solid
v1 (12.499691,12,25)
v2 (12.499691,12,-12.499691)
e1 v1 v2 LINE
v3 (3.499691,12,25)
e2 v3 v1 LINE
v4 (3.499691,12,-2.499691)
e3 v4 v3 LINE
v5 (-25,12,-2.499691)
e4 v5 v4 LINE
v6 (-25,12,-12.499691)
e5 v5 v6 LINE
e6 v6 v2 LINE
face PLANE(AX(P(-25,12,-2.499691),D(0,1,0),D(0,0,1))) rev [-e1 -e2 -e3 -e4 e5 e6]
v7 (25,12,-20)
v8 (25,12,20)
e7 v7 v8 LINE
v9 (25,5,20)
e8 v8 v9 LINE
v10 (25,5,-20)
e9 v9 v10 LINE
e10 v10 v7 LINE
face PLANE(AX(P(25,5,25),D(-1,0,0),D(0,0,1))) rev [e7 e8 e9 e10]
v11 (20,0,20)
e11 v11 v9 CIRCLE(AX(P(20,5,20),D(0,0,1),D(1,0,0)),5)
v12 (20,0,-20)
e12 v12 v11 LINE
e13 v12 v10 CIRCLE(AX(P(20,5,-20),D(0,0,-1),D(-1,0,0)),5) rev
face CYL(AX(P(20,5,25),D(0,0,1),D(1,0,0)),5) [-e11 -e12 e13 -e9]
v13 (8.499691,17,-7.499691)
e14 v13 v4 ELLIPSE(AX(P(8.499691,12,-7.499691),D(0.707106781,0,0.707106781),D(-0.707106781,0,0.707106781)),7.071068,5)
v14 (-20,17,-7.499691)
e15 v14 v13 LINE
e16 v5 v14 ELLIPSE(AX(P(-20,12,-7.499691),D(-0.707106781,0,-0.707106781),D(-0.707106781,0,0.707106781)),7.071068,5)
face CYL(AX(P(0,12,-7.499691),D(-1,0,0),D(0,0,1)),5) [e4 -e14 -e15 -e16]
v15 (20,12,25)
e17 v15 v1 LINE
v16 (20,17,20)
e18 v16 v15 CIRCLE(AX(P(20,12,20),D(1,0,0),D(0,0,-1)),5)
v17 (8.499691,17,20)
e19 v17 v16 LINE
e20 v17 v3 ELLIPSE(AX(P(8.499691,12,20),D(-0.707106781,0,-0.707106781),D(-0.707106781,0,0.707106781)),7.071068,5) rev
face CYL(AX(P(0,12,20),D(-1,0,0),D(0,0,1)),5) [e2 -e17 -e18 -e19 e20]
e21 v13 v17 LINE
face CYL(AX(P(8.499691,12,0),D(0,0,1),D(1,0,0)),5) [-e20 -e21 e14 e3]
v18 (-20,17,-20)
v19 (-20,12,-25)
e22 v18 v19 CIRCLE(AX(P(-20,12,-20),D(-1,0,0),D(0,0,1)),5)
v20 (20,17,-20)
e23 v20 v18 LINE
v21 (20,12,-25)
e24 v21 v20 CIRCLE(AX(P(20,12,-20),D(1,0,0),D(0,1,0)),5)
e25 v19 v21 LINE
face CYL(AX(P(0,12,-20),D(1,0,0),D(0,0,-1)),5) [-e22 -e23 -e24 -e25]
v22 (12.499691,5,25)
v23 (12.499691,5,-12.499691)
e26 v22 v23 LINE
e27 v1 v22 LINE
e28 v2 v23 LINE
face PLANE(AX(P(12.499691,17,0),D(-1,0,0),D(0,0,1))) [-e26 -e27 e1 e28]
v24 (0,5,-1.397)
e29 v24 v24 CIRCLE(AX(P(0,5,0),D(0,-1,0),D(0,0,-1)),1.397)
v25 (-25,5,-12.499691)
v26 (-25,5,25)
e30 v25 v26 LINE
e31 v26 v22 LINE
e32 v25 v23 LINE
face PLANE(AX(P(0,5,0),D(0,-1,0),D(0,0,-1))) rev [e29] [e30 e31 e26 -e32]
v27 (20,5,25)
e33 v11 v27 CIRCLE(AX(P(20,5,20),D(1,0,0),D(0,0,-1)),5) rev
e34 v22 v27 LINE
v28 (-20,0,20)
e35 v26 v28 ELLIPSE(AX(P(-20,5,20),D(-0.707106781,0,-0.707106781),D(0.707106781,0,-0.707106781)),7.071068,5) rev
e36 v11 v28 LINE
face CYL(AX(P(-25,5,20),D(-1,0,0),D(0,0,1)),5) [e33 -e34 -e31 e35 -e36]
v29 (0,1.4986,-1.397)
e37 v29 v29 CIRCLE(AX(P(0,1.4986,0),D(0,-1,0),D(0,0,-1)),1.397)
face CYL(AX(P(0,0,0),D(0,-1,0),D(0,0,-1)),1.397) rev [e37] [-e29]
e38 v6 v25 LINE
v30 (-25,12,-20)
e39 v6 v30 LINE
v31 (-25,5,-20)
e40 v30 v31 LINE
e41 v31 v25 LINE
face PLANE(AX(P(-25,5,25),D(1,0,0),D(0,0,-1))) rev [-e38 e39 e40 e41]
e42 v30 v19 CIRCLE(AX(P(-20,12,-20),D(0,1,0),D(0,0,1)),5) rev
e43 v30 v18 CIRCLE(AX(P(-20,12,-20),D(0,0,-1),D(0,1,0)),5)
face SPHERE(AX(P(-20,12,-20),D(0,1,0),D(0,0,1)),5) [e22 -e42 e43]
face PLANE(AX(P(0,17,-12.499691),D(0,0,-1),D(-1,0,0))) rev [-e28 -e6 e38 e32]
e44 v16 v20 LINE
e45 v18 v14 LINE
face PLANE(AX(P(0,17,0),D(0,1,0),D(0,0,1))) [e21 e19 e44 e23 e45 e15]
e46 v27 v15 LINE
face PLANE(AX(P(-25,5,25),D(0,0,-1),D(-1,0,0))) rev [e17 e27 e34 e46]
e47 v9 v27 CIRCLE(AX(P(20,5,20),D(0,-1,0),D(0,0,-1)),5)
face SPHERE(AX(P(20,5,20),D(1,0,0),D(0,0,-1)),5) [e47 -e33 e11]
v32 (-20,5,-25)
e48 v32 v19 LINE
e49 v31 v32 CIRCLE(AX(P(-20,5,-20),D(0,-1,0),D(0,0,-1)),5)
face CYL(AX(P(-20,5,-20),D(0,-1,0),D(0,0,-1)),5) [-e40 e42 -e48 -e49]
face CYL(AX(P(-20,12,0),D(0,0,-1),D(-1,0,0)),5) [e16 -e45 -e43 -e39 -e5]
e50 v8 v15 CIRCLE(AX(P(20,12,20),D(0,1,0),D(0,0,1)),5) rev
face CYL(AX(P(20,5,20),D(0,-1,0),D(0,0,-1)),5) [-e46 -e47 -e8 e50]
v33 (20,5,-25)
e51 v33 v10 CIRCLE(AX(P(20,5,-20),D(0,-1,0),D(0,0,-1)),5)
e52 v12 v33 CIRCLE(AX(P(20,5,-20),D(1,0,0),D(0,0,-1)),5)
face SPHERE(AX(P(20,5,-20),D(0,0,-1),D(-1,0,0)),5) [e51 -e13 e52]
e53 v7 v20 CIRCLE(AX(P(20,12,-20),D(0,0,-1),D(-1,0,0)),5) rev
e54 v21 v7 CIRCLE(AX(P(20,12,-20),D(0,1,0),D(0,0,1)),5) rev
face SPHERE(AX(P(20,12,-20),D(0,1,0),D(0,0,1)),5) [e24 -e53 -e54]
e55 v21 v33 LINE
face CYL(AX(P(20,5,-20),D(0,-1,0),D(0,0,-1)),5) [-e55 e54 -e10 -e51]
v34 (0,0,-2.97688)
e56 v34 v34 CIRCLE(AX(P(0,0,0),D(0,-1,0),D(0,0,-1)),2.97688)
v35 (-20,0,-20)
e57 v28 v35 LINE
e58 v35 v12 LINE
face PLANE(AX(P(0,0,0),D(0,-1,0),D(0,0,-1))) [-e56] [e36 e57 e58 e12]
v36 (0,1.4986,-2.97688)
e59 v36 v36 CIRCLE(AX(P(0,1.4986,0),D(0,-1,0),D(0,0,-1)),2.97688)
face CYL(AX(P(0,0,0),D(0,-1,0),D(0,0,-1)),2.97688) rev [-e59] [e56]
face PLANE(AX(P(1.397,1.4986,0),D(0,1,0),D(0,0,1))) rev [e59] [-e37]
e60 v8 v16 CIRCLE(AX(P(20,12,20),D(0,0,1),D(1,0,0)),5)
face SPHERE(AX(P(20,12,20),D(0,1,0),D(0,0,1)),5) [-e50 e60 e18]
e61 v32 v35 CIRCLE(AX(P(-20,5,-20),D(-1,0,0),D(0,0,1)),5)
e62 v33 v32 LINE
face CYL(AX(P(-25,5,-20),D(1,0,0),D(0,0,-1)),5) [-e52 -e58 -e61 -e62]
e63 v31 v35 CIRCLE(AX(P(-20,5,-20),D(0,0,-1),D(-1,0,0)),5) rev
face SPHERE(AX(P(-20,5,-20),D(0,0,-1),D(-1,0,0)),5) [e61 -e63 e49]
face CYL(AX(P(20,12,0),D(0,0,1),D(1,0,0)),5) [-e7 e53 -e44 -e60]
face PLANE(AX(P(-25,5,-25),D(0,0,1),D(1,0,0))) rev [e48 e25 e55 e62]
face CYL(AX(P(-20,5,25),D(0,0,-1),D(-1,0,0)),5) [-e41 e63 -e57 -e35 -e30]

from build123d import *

# Parameters (mm, degrees)
SKETCH1_W                                           = 50
SKETCH1_H                                           = 50
BOSS_EXTRUDE1_DEPTH                                 = 5
SKETCH3_W                                           = 37.499690969
SKETCH3_H                                           = 12.500309031
SKETCH3_W_2                                         = 12.500309031
SKETCH3_H_2                                         = 37.499690969
BOSS_EXTRUDE2_DEPTH                                 = 12
SKETCH5_W                                           = 37.499690969
SKETCH5_H                                           = 5
BOSS_EXTRUDE3_DEPTH                                 = 10
SKETCH6_W                                           = 27.499690969
SKETCH6_H                                           = 5
BOSS_EXTRUDE4_DEPTH                                 = 9
FILLET2_R                                           = 5
CBORE_FOR_3_BINDING_HEAD_MACHINE_SCREW1_D           = 2.794
CBORE_FOR_3_BINDING_HEAD_MACHINE_SCREW1_CBORE_D     = 5.95376
CBORE_FOR_3_BINDING_HEAD_MACHINE_SCREW1_CBORE_DEPTH = 1.4986


with BuildPart() as part:
    # Sketch1 → Boss-Extrude1 (new body)
    with BuildSketch(Plane(origin=(0, 0, 0), x_dir=(1, 0, 0), z_dir=(0, 1, 0))):
        Rectangle(SKETCH1_W, SKETCH1_H)
    extrude(amount=BOSS_EXTRUDE1_DEPTH)

    # Sketch3 → Boss-Extrude2 (add)
    with BuildSketch(Plane(origin=(0, 5, 0), x_dir=(1, 0, 0), z_dir=(0, 1, 0))):
        with Locations((-6.250154515, 18.749845484)):
            Rectangle(SKETCH3_W, SKETCH3_H)
        with Locations((18.749845484, 18.749845484)):
            Rectangle(SKETCH3_W_2, SKETCH3_H)
        with Locations((18.749845484, -6.250154515)):
            Rectangle(SKETCH3_W_2, SKETCH3_H_2)
    extrude(amount=BOSS_EXTRUDE2_DEPTH)

    # Sketch5 → Boss-Extrude3 (add)
    with BuildSketch(Plane.XY.offset(-12.499690969)):
        with Locations((-6.250154515, 14.5)):
            Rectangle(SKETCH5_W, SKETCH5_H)
    extrude(amount=BOSS_EXTRUDE3_DEPTH)

    # Sketch6 → Boss-Extrude4 (add)
    with BuildSketch(Plane.ZY.offset(-12.499690969)):
        with Locations((11.250154516, 14.5)):
            Rectangle(SKETCH6_W, SKETCH6_H)
    extrude(amount=BOSS_EXTRUDE4_DEPTH)

    # Fillet2
    fillet2_edges = [part.edges().sort_by_distance(p)[0] for p in [
        (0, 0, 25),
        (-25, 0, 0),
        (0, 0, -25),
        (25, 8.5, -25),
        (-25, 8.5, -25),
        (25, 17, 0),
        (0, 17, -25),
        (-25, 17, -13.749845484),
        (3.499690969, 17, 11.250154516),
        (-10.750154516, 17, -2.499690969),
        (14.249845484, 17, 25),
        (25, 8.5, 25),
        (25, 0, 0),
    ]]
    fillet(fillet2_edges, radius=FILLET2_R - 0.0001)  # a hair under: the kernel refuses the full size

    # CBORE for #3 Binding Head Machine Screw1 (through all)
    with Locations(Plane(origin=(0, 0, 0), x_dir=(-1, 0, 0), z_dir=(0, -1, 0))):
        with Locations((0, 0)):
            CounterBoreHole(CBORE_FOR_3_BINDING_HEAD_MACHINE_SCREW1_D / 2, CBORE_FOR_3_BINDING_HEAD_MACHINE_SCREW1_CBORE_D / 2, CBORE_FOR_3_BINDING_HEAD_MACHINE_SCREW1_CBORE_DEPTH)


solid = part.part
